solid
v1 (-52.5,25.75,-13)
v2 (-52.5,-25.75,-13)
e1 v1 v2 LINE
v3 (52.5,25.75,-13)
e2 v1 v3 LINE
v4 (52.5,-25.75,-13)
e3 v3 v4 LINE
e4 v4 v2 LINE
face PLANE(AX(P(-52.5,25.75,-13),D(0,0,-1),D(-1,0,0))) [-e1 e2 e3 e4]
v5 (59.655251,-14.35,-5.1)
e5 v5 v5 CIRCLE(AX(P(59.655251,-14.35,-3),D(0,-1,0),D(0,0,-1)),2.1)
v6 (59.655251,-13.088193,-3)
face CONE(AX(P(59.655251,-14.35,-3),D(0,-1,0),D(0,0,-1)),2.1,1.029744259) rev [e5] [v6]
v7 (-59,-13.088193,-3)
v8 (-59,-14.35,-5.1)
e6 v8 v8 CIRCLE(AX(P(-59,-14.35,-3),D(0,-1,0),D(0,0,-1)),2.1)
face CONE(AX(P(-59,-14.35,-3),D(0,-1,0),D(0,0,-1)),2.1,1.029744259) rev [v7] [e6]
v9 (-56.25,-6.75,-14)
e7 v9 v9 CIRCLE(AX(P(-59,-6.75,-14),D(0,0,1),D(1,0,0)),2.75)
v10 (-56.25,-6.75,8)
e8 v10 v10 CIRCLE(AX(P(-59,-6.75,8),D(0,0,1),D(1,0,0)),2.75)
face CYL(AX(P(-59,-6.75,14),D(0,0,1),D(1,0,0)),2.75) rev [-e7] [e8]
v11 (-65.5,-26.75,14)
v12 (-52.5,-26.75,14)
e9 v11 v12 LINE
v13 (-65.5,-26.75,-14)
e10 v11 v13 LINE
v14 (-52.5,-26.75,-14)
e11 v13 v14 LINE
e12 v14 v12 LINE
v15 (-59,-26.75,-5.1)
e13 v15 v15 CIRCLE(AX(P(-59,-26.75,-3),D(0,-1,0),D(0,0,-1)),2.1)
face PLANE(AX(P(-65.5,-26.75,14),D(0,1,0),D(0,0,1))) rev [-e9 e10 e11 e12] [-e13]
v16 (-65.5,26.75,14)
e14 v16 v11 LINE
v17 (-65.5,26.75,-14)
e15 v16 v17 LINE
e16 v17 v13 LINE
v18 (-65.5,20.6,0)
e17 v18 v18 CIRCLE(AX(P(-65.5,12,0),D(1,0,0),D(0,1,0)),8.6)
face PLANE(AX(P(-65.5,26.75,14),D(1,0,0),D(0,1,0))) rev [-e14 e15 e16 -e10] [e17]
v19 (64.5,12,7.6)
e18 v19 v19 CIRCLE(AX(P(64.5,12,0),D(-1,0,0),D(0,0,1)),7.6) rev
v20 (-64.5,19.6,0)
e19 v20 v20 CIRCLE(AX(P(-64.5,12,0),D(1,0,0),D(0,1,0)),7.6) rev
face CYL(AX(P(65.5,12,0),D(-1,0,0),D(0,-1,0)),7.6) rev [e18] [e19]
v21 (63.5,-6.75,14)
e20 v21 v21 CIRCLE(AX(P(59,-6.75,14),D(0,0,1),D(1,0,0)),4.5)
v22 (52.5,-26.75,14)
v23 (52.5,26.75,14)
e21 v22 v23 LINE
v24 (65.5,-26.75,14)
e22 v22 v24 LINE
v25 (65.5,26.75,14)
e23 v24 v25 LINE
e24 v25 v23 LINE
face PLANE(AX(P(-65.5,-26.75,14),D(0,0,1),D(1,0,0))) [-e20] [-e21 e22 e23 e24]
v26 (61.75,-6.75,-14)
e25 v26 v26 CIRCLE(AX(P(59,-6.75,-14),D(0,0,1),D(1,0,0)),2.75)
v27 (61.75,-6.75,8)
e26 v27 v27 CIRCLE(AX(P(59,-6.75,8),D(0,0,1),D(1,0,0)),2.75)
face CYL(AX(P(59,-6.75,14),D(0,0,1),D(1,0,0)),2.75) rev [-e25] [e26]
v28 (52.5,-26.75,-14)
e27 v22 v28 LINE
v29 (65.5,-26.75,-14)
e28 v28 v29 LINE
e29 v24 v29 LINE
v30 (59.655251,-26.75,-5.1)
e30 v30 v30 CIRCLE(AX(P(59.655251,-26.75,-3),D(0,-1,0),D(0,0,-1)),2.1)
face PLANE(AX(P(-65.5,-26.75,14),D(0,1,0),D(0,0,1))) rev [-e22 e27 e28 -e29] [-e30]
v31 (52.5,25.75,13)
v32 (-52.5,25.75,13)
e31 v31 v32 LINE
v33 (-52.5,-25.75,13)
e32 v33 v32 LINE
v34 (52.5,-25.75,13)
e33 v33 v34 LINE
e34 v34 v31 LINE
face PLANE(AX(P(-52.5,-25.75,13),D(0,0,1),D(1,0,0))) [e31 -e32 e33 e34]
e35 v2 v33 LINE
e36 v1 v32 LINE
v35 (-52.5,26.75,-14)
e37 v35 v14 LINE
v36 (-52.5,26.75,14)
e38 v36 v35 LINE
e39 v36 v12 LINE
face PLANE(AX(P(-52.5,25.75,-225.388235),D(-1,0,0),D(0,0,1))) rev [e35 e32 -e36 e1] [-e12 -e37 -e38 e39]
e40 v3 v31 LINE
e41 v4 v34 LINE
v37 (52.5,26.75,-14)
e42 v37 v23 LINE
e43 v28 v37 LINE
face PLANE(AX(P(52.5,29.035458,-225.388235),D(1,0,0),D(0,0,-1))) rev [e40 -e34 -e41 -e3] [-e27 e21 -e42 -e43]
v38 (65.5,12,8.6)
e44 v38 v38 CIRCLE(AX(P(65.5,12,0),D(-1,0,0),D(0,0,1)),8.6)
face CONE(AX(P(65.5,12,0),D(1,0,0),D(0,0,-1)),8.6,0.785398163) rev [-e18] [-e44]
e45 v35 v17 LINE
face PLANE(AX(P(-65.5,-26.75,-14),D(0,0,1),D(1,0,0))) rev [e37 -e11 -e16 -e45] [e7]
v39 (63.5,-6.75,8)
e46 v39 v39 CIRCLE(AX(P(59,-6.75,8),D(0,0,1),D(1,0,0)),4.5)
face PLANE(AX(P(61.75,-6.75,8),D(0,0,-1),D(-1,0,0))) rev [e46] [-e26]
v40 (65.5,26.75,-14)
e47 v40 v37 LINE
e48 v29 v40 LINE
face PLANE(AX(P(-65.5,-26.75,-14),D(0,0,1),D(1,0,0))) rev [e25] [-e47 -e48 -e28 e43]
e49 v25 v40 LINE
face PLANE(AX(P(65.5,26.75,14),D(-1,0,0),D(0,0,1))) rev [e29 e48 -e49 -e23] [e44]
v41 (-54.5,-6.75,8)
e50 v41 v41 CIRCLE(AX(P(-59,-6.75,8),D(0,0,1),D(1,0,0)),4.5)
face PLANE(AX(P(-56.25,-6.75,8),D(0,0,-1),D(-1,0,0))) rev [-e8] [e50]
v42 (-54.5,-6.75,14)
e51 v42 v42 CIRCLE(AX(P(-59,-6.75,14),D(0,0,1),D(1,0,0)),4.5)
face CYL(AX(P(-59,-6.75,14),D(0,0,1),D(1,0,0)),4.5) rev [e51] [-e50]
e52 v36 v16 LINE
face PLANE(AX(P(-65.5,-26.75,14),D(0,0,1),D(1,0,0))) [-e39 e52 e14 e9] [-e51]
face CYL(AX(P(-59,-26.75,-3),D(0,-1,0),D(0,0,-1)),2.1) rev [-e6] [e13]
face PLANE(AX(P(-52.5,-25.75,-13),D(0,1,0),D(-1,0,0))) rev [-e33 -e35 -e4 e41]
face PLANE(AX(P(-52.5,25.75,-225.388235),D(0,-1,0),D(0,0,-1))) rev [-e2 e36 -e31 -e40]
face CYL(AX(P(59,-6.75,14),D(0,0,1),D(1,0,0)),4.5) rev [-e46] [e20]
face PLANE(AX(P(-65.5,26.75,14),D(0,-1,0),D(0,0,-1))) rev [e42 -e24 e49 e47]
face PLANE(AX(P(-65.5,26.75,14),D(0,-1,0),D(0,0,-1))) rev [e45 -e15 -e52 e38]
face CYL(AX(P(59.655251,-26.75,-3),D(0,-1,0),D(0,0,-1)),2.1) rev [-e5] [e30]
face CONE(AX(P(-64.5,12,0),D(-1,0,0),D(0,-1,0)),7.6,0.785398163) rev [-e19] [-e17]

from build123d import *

# Parameters (mm, degrees)
SKETCH1_W                               = 131
SKETCH1_H                               = 53.5
EXTRUDE1_DEPTH                          = 14
CUT_SWEEP1_START                        = -14
CUT_SWEEP1_OUTLINE_W                    = 105
CUT_SWEEP1_OUTLINE_H                    = 1
CUT_SWEEP1_DEPTH                        = 28
CUT_SWEEP1_2_OUTLINE_W                  = 105
CUT_SWEEP1_2_OUTLINE_H                  = 51.5
CUT_SWEEP1_2_DEPTH                      = 1
CUT_SWEEP1_START_2                      = 13
CUT_SWEEP1_3_OUTLINE_W                  = 105
CUT_SWEEP1_3_OUTLINE_H                  = 51.5
CUT_SWEEP1_3_DEPTH                      = 1
SKETCH3_R                               = 7.6
CUT_EXTRUDE1_DEPTH                      = 135.434231132
CBORE_FOR_M5_HEX_HEAD_BOLT1_D           = 5.5
CBORE_FOR_M5_HEX_HEAD_BOLT1_CBORE_D     = 9
CBORE_FOR_M5_HEX_HEAD_BOLT1_CBORE_DEPTH = 6
CHAMFER1_SIZE                           = 1
M5X0_8_TAPPED_HOLE1_D                   = 4.2
M5X0_8_TAPPED_HOLE1_DEPTH               = 12.4
M5X0_8_TAPPED_HOLE1_TIP                 = 1.2618073


# Read off the part's stored shape, not the designer's step: Cut-Sweep1
with BuildPart() as part:
    # Sketch1 → Extrude1 (new, symmetric)
    with BuildSketch(Plane.XY):
        Rectangle(SKETCH1_W, SKETCH1_H)
    extrude(amount=EXTRUDE1_DEPTH, both=True)

    # Cut-Sweep1 outline → Cut-Sweep1 (cut)
    with BuildSketch(Plane.XY.offset(CUT_SWEEP1_START)):
        with Locations((0, -26.25)):
            Rectangle(CUT_SWEEP1_OUTLINE_W, CUT_SWEEP1_OUTLINE_H)
        with Locations((0, 26.25)):
            Rectangle(CUT_SWEEP1_OUTLINE_W, CUT_SWEEP1_OUTLINE_H)
    extrude(amount=CUT_SWEEP1_DEPTH, mode=Mode.SUBTRACT)

    # Cut-Sweep1 2 outline → Cut-Sweep1 2 (cut)
    with BuildSketch(Plane.XY.offset(CUT_SWEEP1_START)):
        Rectangle(CUT_SWEEP1_2_OUTLINE_W, CUT_SWEEP1_2_OUTLINE_H)
    extrude(amount=CUT_SWEEP1_2_DEPTH, mode=Mode.SUBTRACT)

    # Cut-Sweep1 3 outline → Cut-Sweep1 3 (cut)
    with BuildSketch(Plane.XY.offset(CUT_SWEEP1_START_2)):
        Rectangle(CUT_SWEEP1_3_OUTLINE_W, CUT_SWEEP1_3_OUTLINE_H)
    extrude(amount=CUT_SWEEP1_3_DEPTH, mode=Mode.SUBTRACT)

    # Sketch3 → Cut-Extrude1 (cut, through all)
    with BuildSketch(Plane.ZY.offset(65.5)):
        with Locations(Location((0, 12, 0), (0, 0, 270))):
            Circle(SKETCH3_R)
    extrude(amount=-CUT_EXTRUDE1_DEPTH, mode=Mode.SUBTRACT)

    # CBORE for M5 Hex Head Bolt1 (through all)
    with Locations(Plane(origin=(-59, -6.75, 14), x_dir=(1, 0, 0), z_dir=(0, 0, 1))):
        with Locations((0, 0), (118, 0)):
            CounterBoreHole(CBORE_FOR_M5_HEX_HEAD_BOLT1_D / 2, CBORE_FOR_M5_HEX_HEAD_BOLT1_CBORE_D / 2, CBORE_FOR_M5_HEX_HEAD_BOLT1_CBORE_DEPTH)

    # Chamfer1
    chamfer1_edges = [part.edges().sort_by_distance(p)[0] for p in [
        (65.5, 19.6, 0),
        (-65.5, 19.6, 0),
    ]]
    chamfer(chamfer1_edges, length=CHAMFER1_SIZE)

    # M5x0.8 Tapped Hole1
    with Locations(Plane(origin=(-59, -26.75, -3), x_dir=(0, 0, -1), z_dir=(0, -1, 0))):
        with Locations((0, 0), (0, 118.655251347)):
            Hole(M5X0_8_TAPPED_HOLE1_D / 2, depth=M5X0_8_TAPPED_HOLE1_DEPTH)
            with Locations((0, 0, -(M5X0_8_TAPPED_HOLE1_DEPTH + M5X0_8_TAPPED_HOLE1_TIP / 2))):  # 118° drill point
                Cone(0, M5X0_8_TAPPED_HOLE1_D / 2, M5X0_8_TAPPED_HOLE1_TIP, mode=Mode.SUBTRACT)


solid = part.part
